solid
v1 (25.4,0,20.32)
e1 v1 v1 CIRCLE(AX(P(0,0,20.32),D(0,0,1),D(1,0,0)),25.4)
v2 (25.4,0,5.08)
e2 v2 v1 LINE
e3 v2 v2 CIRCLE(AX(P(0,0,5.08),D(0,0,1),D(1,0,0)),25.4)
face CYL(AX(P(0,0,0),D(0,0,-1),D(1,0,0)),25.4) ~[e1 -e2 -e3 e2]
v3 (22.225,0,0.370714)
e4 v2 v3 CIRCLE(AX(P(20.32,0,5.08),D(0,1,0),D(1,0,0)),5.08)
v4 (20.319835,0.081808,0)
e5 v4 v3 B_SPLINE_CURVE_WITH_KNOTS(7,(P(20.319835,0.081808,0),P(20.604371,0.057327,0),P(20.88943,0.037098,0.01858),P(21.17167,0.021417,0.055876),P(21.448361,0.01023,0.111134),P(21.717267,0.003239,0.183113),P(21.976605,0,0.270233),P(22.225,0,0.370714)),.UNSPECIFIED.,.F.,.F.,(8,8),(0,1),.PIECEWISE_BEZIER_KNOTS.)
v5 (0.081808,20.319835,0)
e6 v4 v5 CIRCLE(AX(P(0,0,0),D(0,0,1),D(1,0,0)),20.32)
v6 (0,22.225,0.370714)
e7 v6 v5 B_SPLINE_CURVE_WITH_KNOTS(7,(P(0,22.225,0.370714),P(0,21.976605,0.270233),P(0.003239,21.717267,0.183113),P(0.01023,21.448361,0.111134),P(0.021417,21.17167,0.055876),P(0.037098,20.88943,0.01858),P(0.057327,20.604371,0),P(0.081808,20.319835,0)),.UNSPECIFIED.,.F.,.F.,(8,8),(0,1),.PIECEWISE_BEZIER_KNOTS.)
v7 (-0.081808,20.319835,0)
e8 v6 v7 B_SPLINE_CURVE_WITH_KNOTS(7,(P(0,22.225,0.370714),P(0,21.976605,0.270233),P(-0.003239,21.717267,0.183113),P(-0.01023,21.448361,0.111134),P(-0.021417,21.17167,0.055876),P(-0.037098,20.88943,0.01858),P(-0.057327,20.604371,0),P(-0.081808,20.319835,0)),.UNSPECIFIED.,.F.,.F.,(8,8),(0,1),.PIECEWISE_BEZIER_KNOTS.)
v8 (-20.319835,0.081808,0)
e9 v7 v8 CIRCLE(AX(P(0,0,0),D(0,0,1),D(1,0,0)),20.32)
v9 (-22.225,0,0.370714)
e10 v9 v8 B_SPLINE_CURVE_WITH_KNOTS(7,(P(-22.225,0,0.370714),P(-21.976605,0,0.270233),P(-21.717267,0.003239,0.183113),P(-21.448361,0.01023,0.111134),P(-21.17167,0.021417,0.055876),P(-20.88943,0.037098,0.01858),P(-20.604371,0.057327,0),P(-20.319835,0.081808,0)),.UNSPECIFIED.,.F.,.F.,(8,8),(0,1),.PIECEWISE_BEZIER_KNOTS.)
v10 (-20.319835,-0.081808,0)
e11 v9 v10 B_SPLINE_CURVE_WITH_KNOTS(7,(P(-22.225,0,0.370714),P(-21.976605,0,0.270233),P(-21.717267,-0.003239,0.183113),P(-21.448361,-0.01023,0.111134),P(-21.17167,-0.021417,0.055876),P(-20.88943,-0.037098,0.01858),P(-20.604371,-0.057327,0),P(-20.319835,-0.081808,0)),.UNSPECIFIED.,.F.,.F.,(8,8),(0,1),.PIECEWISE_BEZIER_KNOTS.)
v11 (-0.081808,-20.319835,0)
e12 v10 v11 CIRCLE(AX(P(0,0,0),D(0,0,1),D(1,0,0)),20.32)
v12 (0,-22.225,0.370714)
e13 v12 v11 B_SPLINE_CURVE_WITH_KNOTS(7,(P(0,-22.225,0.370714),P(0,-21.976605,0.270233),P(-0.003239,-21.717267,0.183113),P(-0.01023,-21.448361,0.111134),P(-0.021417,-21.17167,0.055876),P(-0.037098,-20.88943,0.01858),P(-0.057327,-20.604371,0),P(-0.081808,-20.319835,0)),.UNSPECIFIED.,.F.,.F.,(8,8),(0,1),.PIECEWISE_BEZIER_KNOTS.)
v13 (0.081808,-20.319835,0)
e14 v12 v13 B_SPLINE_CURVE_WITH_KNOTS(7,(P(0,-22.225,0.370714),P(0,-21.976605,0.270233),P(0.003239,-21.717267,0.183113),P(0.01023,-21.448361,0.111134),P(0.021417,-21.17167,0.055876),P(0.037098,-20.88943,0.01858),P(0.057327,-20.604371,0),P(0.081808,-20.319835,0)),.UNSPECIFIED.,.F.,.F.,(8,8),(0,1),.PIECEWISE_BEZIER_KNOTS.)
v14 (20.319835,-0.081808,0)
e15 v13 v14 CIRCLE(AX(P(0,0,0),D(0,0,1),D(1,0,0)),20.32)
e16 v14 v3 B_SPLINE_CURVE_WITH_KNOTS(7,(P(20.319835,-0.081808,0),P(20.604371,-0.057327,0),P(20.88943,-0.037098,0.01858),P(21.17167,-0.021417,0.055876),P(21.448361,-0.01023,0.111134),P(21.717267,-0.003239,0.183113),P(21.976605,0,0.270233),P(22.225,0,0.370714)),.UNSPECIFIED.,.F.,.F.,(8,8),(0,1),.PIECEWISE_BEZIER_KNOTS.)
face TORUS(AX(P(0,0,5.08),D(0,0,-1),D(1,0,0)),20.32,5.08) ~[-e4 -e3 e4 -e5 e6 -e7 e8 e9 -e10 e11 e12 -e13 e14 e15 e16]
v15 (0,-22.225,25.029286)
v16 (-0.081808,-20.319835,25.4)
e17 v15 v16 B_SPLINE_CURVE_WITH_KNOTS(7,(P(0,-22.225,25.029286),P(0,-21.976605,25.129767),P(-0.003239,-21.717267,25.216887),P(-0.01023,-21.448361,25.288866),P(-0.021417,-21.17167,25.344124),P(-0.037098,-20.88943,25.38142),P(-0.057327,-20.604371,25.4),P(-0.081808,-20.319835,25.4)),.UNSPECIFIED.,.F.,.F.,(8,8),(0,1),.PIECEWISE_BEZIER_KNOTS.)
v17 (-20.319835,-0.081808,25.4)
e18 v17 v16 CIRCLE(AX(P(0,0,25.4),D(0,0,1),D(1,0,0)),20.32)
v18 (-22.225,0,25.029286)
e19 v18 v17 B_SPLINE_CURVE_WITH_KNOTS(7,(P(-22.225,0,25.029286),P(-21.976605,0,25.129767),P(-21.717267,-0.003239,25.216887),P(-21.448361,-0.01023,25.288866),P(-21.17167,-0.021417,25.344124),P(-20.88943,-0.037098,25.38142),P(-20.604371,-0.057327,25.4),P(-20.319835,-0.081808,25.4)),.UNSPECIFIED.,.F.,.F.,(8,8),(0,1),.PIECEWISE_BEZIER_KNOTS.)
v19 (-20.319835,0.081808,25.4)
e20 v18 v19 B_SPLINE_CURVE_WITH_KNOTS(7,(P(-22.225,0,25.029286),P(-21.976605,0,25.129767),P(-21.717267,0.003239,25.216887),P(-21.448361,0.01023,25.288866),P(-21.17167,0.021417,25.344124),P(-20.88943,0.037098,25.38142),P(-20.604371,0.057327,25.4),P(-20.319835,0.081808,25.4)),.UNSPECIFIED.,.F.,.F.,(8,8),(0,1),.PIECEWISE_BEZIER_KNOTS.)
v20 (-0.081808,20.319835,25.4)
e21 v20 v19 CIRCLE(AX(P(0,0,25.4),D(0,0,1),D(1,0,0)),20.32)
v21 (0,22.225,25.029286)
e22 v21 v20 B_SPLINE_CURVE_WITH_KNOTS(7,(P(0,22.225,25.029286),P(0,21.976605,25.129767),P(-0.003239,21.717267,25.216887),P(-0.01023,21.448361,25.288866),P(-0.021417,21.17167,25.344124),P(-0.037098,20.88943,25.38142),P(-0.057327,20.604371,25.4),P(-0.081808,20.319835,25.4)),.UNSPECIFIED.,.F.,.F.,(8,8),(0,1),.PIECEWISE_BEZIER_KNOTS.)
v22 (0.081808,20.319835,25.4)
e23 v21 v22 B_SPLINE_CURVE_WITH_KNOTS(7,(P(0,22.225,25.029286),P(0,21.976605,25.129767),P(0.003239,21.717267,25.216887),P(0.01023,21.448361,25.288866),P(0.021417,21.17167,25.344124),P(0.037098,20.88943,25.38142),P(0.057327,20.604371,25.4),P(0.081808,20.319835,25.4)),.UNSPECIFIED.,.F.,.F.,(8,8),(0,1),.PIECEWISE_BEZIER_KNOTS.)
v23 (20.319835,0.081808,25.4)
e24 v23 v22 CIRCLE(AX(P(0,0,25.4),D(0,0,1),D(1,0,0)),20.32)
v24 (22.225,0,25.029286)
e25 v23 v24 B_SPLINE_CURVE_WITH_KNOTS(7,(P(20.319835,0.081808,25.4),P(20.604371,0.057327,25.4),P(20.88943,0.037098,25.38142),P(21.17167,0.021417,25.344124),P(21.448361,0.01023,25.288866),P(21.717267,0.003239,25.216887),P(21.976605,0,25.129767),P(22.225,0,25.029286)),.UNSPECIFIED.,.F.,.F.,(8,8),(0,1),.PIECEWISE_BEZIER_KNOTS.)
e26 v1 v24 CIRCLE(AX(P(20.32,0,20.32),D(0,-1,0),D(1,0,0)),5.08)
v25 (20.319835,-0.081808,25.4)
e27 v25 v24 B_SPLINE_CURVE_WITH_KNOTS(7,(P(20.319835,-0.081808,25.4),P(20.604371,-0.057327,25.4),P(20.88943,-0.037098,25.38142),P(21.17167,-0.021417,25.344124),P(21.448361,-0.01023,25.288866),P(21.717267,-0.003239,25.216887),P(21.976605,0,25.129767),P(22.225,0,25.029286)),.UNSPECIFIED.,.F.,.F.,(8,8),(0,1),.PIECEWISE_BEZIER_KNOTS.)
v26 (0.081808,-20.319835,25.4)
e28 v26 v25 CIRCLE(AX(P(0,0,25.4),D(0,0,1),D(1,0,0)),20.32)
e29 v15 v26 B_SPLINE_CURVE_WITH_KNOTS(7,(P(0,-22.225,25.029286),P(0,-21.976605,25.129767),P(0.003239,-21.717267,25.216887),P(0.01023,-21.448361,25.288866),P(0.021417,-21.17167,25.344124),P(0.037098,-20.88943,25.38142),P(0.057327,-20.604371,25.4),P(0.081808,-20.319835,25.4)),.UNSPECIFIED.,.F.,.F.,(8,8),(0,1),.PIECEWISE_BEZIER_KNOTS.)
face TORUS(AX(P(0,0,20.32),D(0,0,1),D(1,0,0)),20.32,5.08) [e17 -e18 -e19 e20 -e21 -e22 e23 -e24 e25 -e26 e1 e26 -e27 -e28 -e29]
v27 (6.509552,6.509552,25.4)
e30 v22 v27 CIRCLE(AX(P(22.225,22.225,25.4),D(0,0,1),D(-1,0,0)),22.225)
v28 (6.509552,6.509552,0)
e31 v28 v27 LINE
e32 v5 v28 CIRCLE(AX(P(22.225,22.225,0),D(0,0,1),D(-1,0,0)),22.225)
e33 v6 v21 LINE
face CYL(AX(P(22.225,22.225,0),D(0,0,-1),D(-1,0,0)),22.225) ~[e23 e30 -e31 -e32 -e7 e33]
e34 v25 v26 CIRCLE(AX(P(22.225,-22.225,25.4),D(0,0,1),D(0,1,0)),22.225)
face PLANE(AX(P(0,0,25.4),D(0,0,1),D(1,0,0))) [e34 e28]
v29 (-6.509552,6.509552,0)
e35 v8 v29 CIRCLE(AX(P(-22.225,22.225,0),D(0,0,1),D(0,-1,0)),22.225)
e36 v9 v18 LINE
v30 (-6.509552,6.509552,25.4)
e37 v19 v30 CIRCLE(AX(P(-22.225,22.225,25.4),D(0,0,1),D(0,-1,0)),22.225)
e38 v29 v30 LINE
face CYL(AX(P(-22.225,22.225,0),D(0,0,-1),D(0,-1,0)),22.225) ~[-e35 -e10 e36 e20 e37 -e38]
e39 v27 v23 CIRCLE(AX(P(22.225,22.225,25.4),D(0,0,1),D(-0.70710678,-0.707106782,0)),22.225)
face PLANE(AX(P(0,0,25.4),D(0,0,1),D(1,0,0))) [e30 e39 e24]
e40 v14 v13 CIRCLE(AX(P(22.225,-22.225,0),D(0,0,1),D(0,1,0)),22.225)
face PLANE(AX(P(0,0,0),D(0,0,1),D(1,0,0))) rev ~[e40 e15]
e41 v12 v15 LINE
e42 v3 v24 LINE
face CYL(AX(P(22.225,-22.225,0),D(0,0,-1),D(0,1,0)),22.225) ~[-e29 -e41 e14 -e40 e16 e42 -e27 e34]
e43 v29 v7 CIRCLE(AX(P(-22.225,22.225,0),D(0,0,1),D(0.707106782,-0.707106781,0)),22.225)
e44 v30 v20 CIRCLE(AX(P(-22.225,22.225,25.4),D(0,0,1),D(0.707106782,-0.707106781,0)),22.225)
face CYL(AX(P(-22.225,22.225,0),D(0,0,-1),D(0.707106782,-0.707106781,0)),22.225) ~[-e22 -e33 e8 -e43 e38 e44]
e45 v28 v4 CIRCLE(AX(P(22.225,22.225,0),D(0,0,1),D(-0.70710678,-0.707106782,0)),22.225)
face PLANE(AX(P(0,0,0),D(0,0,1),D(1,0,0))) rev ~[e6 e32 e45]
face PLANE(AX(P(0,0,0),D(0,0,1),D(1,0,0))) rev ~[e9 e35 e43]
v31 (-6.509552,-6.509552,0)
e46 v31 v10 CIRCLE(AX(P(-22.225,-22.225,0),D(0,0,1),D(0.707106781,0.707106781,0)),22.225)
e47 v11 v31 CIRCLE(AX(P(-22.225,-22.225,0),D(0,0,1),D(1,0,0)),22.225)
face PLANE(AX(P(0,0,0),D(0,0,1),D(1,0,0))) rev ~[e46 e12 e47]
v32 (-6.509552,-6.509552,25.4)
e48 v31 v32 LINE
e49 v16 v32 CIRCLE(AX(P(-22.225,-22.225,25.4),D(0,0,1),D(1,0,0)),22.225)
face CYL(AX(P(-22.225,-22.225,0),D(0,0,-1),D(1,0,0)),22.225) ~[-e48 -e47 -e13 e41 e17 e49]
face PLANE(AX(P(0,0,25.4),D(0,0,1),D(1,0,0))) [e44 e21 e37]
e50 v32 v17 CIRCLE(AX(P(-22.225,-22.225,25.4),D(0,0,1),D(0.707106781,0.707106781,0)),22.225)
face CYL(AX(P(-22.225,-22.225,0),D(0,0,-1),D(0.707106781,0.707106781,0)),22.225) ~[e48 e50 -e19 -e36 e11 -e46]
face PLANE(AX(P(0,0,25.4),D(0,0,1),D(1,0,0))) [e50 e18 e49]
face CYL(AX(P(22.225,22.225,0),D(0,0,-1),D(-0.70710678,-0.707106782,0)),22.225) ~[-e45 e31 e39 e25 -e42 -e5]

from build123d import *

# Parameters (mm, degrees)
F0_R     = 25.4
F1_DEPTH = 25.4


# Not quite as in the source:
# - a fillet or chamfer that OpenCascade refuses, or shapes differently, is made with other operations: its cross-section is extruded or revolved along the edge and cut away or added


with BuildPart() as f1:
    # F0 (on Top) → F1 (new body)
    with BuildSketch(Plane.XY):
        Circle(F0_R)
        with BuildLine():
            ThreePointArc((0, 22.225), (15.7154482119, 15.7154482119), (22.225, 0))
            ThreePointArc((22.225, 0), (15.7154482119, -15.7154482119), (0, -22.225))
            ThreePointArc((0, -22.225), (-15.7154482119, -15.7154482119), (-22.225, 0))
            ThreePointArc((-22.225, 0), (-15.7154482119, 15.7154482119), (0, 22.225))
        make_face(mode=Mode.SUBTRACT)
        with BuildLine():
            ThreePointArc((-6.5095517729, 6.5095518034), (-1.6917773858, 13.7198607256), (0, 22.225))
            ThreePointArc((0, 22.225), (-15.7154482119, 15.7154482119), (-22.225, 0))
            ThreePointArc((-22.225, 0), (-13.7198607057, 1.6917773941), (-6.5095517729, 6.5095518034))
        make_face()
        with BuildLine():
            ThreePointArc((6.509551813, 6.5095517633), (13.7198607319, 1.6917773832), (22.225, 0))
            ThreePointArc((22.225, 0), (15.7154482119, 15.7154482119), (0, 22.225))
            ThreePointArc((0, 22.225), (1.6917773967, 13.7198606994), (6.509551813, 6.5095517633))
        make_face()
        with BuildLine():
            ThreePointArc((-22.225, 0), (-15.7154482119, -15.7154482119), (0, -22.225))
            ThreePointArc((0, -22.225), (-1.6917773909, -13.7198607133), (-6.5095517917, -6.5095517845))
            ThreePointArc((-6.5095517917, -6.5095517845), (-13.719860718, -1.691777389), (-22.225, 0))
        make_face()
        with BuildLine():
            ThreePointArc((0, -22.225), (15.7154482119, -15.7154482119), (22.225, 0))
            ThreePointArc((22.225, 0), (13.7198607157, -1.6917773899), (6.5095517881, -6.5095517881))
            ThreePointArc((6.5095517881, -6.5095517881), (1.6917773899, -13.7198607157), (0, -22.225))
        make_face()
    extrude(amount=F1_DEPTH)

    # F2: fillet of radius 5.08 on 2 edges, made by hand

    # F2_s1 → F2_t2 (revolve, cut)
    with BuildSketch(Plane.XZ):
        with BuildLine():
            ThreePointArc((25.4, 20.32), (23.9121024484, 23.9121024484), (20.32, 25.4))
            Line((20.32, 25.4), (25.4, 25.4))
            Line((25.4, 25.4), (25.4, 20.32))
        make_face()
    revolve(axis=Axis((0, 0, 25.4), (0, 0, 1)), mode=Mode.SUBTRACT)

    # F2_s3 → F2_t4 (revolve, cut)
    with BuildSketch(Plane.XZ):
        with BuildLine():
            ThreePointArc((25.4, 5.08), (23.9121024484, 1.4878975516), (20.32, 0))
            Line((20.32, 0), (25.4, 0))
            Line((25.4, 0), (25.4, 5.08))
        make_face()
    revolve(axis=Axis((0, 0, 0), (0, 0, 1)), mode=Mode.SUBTRACT)


solid = f1.part
